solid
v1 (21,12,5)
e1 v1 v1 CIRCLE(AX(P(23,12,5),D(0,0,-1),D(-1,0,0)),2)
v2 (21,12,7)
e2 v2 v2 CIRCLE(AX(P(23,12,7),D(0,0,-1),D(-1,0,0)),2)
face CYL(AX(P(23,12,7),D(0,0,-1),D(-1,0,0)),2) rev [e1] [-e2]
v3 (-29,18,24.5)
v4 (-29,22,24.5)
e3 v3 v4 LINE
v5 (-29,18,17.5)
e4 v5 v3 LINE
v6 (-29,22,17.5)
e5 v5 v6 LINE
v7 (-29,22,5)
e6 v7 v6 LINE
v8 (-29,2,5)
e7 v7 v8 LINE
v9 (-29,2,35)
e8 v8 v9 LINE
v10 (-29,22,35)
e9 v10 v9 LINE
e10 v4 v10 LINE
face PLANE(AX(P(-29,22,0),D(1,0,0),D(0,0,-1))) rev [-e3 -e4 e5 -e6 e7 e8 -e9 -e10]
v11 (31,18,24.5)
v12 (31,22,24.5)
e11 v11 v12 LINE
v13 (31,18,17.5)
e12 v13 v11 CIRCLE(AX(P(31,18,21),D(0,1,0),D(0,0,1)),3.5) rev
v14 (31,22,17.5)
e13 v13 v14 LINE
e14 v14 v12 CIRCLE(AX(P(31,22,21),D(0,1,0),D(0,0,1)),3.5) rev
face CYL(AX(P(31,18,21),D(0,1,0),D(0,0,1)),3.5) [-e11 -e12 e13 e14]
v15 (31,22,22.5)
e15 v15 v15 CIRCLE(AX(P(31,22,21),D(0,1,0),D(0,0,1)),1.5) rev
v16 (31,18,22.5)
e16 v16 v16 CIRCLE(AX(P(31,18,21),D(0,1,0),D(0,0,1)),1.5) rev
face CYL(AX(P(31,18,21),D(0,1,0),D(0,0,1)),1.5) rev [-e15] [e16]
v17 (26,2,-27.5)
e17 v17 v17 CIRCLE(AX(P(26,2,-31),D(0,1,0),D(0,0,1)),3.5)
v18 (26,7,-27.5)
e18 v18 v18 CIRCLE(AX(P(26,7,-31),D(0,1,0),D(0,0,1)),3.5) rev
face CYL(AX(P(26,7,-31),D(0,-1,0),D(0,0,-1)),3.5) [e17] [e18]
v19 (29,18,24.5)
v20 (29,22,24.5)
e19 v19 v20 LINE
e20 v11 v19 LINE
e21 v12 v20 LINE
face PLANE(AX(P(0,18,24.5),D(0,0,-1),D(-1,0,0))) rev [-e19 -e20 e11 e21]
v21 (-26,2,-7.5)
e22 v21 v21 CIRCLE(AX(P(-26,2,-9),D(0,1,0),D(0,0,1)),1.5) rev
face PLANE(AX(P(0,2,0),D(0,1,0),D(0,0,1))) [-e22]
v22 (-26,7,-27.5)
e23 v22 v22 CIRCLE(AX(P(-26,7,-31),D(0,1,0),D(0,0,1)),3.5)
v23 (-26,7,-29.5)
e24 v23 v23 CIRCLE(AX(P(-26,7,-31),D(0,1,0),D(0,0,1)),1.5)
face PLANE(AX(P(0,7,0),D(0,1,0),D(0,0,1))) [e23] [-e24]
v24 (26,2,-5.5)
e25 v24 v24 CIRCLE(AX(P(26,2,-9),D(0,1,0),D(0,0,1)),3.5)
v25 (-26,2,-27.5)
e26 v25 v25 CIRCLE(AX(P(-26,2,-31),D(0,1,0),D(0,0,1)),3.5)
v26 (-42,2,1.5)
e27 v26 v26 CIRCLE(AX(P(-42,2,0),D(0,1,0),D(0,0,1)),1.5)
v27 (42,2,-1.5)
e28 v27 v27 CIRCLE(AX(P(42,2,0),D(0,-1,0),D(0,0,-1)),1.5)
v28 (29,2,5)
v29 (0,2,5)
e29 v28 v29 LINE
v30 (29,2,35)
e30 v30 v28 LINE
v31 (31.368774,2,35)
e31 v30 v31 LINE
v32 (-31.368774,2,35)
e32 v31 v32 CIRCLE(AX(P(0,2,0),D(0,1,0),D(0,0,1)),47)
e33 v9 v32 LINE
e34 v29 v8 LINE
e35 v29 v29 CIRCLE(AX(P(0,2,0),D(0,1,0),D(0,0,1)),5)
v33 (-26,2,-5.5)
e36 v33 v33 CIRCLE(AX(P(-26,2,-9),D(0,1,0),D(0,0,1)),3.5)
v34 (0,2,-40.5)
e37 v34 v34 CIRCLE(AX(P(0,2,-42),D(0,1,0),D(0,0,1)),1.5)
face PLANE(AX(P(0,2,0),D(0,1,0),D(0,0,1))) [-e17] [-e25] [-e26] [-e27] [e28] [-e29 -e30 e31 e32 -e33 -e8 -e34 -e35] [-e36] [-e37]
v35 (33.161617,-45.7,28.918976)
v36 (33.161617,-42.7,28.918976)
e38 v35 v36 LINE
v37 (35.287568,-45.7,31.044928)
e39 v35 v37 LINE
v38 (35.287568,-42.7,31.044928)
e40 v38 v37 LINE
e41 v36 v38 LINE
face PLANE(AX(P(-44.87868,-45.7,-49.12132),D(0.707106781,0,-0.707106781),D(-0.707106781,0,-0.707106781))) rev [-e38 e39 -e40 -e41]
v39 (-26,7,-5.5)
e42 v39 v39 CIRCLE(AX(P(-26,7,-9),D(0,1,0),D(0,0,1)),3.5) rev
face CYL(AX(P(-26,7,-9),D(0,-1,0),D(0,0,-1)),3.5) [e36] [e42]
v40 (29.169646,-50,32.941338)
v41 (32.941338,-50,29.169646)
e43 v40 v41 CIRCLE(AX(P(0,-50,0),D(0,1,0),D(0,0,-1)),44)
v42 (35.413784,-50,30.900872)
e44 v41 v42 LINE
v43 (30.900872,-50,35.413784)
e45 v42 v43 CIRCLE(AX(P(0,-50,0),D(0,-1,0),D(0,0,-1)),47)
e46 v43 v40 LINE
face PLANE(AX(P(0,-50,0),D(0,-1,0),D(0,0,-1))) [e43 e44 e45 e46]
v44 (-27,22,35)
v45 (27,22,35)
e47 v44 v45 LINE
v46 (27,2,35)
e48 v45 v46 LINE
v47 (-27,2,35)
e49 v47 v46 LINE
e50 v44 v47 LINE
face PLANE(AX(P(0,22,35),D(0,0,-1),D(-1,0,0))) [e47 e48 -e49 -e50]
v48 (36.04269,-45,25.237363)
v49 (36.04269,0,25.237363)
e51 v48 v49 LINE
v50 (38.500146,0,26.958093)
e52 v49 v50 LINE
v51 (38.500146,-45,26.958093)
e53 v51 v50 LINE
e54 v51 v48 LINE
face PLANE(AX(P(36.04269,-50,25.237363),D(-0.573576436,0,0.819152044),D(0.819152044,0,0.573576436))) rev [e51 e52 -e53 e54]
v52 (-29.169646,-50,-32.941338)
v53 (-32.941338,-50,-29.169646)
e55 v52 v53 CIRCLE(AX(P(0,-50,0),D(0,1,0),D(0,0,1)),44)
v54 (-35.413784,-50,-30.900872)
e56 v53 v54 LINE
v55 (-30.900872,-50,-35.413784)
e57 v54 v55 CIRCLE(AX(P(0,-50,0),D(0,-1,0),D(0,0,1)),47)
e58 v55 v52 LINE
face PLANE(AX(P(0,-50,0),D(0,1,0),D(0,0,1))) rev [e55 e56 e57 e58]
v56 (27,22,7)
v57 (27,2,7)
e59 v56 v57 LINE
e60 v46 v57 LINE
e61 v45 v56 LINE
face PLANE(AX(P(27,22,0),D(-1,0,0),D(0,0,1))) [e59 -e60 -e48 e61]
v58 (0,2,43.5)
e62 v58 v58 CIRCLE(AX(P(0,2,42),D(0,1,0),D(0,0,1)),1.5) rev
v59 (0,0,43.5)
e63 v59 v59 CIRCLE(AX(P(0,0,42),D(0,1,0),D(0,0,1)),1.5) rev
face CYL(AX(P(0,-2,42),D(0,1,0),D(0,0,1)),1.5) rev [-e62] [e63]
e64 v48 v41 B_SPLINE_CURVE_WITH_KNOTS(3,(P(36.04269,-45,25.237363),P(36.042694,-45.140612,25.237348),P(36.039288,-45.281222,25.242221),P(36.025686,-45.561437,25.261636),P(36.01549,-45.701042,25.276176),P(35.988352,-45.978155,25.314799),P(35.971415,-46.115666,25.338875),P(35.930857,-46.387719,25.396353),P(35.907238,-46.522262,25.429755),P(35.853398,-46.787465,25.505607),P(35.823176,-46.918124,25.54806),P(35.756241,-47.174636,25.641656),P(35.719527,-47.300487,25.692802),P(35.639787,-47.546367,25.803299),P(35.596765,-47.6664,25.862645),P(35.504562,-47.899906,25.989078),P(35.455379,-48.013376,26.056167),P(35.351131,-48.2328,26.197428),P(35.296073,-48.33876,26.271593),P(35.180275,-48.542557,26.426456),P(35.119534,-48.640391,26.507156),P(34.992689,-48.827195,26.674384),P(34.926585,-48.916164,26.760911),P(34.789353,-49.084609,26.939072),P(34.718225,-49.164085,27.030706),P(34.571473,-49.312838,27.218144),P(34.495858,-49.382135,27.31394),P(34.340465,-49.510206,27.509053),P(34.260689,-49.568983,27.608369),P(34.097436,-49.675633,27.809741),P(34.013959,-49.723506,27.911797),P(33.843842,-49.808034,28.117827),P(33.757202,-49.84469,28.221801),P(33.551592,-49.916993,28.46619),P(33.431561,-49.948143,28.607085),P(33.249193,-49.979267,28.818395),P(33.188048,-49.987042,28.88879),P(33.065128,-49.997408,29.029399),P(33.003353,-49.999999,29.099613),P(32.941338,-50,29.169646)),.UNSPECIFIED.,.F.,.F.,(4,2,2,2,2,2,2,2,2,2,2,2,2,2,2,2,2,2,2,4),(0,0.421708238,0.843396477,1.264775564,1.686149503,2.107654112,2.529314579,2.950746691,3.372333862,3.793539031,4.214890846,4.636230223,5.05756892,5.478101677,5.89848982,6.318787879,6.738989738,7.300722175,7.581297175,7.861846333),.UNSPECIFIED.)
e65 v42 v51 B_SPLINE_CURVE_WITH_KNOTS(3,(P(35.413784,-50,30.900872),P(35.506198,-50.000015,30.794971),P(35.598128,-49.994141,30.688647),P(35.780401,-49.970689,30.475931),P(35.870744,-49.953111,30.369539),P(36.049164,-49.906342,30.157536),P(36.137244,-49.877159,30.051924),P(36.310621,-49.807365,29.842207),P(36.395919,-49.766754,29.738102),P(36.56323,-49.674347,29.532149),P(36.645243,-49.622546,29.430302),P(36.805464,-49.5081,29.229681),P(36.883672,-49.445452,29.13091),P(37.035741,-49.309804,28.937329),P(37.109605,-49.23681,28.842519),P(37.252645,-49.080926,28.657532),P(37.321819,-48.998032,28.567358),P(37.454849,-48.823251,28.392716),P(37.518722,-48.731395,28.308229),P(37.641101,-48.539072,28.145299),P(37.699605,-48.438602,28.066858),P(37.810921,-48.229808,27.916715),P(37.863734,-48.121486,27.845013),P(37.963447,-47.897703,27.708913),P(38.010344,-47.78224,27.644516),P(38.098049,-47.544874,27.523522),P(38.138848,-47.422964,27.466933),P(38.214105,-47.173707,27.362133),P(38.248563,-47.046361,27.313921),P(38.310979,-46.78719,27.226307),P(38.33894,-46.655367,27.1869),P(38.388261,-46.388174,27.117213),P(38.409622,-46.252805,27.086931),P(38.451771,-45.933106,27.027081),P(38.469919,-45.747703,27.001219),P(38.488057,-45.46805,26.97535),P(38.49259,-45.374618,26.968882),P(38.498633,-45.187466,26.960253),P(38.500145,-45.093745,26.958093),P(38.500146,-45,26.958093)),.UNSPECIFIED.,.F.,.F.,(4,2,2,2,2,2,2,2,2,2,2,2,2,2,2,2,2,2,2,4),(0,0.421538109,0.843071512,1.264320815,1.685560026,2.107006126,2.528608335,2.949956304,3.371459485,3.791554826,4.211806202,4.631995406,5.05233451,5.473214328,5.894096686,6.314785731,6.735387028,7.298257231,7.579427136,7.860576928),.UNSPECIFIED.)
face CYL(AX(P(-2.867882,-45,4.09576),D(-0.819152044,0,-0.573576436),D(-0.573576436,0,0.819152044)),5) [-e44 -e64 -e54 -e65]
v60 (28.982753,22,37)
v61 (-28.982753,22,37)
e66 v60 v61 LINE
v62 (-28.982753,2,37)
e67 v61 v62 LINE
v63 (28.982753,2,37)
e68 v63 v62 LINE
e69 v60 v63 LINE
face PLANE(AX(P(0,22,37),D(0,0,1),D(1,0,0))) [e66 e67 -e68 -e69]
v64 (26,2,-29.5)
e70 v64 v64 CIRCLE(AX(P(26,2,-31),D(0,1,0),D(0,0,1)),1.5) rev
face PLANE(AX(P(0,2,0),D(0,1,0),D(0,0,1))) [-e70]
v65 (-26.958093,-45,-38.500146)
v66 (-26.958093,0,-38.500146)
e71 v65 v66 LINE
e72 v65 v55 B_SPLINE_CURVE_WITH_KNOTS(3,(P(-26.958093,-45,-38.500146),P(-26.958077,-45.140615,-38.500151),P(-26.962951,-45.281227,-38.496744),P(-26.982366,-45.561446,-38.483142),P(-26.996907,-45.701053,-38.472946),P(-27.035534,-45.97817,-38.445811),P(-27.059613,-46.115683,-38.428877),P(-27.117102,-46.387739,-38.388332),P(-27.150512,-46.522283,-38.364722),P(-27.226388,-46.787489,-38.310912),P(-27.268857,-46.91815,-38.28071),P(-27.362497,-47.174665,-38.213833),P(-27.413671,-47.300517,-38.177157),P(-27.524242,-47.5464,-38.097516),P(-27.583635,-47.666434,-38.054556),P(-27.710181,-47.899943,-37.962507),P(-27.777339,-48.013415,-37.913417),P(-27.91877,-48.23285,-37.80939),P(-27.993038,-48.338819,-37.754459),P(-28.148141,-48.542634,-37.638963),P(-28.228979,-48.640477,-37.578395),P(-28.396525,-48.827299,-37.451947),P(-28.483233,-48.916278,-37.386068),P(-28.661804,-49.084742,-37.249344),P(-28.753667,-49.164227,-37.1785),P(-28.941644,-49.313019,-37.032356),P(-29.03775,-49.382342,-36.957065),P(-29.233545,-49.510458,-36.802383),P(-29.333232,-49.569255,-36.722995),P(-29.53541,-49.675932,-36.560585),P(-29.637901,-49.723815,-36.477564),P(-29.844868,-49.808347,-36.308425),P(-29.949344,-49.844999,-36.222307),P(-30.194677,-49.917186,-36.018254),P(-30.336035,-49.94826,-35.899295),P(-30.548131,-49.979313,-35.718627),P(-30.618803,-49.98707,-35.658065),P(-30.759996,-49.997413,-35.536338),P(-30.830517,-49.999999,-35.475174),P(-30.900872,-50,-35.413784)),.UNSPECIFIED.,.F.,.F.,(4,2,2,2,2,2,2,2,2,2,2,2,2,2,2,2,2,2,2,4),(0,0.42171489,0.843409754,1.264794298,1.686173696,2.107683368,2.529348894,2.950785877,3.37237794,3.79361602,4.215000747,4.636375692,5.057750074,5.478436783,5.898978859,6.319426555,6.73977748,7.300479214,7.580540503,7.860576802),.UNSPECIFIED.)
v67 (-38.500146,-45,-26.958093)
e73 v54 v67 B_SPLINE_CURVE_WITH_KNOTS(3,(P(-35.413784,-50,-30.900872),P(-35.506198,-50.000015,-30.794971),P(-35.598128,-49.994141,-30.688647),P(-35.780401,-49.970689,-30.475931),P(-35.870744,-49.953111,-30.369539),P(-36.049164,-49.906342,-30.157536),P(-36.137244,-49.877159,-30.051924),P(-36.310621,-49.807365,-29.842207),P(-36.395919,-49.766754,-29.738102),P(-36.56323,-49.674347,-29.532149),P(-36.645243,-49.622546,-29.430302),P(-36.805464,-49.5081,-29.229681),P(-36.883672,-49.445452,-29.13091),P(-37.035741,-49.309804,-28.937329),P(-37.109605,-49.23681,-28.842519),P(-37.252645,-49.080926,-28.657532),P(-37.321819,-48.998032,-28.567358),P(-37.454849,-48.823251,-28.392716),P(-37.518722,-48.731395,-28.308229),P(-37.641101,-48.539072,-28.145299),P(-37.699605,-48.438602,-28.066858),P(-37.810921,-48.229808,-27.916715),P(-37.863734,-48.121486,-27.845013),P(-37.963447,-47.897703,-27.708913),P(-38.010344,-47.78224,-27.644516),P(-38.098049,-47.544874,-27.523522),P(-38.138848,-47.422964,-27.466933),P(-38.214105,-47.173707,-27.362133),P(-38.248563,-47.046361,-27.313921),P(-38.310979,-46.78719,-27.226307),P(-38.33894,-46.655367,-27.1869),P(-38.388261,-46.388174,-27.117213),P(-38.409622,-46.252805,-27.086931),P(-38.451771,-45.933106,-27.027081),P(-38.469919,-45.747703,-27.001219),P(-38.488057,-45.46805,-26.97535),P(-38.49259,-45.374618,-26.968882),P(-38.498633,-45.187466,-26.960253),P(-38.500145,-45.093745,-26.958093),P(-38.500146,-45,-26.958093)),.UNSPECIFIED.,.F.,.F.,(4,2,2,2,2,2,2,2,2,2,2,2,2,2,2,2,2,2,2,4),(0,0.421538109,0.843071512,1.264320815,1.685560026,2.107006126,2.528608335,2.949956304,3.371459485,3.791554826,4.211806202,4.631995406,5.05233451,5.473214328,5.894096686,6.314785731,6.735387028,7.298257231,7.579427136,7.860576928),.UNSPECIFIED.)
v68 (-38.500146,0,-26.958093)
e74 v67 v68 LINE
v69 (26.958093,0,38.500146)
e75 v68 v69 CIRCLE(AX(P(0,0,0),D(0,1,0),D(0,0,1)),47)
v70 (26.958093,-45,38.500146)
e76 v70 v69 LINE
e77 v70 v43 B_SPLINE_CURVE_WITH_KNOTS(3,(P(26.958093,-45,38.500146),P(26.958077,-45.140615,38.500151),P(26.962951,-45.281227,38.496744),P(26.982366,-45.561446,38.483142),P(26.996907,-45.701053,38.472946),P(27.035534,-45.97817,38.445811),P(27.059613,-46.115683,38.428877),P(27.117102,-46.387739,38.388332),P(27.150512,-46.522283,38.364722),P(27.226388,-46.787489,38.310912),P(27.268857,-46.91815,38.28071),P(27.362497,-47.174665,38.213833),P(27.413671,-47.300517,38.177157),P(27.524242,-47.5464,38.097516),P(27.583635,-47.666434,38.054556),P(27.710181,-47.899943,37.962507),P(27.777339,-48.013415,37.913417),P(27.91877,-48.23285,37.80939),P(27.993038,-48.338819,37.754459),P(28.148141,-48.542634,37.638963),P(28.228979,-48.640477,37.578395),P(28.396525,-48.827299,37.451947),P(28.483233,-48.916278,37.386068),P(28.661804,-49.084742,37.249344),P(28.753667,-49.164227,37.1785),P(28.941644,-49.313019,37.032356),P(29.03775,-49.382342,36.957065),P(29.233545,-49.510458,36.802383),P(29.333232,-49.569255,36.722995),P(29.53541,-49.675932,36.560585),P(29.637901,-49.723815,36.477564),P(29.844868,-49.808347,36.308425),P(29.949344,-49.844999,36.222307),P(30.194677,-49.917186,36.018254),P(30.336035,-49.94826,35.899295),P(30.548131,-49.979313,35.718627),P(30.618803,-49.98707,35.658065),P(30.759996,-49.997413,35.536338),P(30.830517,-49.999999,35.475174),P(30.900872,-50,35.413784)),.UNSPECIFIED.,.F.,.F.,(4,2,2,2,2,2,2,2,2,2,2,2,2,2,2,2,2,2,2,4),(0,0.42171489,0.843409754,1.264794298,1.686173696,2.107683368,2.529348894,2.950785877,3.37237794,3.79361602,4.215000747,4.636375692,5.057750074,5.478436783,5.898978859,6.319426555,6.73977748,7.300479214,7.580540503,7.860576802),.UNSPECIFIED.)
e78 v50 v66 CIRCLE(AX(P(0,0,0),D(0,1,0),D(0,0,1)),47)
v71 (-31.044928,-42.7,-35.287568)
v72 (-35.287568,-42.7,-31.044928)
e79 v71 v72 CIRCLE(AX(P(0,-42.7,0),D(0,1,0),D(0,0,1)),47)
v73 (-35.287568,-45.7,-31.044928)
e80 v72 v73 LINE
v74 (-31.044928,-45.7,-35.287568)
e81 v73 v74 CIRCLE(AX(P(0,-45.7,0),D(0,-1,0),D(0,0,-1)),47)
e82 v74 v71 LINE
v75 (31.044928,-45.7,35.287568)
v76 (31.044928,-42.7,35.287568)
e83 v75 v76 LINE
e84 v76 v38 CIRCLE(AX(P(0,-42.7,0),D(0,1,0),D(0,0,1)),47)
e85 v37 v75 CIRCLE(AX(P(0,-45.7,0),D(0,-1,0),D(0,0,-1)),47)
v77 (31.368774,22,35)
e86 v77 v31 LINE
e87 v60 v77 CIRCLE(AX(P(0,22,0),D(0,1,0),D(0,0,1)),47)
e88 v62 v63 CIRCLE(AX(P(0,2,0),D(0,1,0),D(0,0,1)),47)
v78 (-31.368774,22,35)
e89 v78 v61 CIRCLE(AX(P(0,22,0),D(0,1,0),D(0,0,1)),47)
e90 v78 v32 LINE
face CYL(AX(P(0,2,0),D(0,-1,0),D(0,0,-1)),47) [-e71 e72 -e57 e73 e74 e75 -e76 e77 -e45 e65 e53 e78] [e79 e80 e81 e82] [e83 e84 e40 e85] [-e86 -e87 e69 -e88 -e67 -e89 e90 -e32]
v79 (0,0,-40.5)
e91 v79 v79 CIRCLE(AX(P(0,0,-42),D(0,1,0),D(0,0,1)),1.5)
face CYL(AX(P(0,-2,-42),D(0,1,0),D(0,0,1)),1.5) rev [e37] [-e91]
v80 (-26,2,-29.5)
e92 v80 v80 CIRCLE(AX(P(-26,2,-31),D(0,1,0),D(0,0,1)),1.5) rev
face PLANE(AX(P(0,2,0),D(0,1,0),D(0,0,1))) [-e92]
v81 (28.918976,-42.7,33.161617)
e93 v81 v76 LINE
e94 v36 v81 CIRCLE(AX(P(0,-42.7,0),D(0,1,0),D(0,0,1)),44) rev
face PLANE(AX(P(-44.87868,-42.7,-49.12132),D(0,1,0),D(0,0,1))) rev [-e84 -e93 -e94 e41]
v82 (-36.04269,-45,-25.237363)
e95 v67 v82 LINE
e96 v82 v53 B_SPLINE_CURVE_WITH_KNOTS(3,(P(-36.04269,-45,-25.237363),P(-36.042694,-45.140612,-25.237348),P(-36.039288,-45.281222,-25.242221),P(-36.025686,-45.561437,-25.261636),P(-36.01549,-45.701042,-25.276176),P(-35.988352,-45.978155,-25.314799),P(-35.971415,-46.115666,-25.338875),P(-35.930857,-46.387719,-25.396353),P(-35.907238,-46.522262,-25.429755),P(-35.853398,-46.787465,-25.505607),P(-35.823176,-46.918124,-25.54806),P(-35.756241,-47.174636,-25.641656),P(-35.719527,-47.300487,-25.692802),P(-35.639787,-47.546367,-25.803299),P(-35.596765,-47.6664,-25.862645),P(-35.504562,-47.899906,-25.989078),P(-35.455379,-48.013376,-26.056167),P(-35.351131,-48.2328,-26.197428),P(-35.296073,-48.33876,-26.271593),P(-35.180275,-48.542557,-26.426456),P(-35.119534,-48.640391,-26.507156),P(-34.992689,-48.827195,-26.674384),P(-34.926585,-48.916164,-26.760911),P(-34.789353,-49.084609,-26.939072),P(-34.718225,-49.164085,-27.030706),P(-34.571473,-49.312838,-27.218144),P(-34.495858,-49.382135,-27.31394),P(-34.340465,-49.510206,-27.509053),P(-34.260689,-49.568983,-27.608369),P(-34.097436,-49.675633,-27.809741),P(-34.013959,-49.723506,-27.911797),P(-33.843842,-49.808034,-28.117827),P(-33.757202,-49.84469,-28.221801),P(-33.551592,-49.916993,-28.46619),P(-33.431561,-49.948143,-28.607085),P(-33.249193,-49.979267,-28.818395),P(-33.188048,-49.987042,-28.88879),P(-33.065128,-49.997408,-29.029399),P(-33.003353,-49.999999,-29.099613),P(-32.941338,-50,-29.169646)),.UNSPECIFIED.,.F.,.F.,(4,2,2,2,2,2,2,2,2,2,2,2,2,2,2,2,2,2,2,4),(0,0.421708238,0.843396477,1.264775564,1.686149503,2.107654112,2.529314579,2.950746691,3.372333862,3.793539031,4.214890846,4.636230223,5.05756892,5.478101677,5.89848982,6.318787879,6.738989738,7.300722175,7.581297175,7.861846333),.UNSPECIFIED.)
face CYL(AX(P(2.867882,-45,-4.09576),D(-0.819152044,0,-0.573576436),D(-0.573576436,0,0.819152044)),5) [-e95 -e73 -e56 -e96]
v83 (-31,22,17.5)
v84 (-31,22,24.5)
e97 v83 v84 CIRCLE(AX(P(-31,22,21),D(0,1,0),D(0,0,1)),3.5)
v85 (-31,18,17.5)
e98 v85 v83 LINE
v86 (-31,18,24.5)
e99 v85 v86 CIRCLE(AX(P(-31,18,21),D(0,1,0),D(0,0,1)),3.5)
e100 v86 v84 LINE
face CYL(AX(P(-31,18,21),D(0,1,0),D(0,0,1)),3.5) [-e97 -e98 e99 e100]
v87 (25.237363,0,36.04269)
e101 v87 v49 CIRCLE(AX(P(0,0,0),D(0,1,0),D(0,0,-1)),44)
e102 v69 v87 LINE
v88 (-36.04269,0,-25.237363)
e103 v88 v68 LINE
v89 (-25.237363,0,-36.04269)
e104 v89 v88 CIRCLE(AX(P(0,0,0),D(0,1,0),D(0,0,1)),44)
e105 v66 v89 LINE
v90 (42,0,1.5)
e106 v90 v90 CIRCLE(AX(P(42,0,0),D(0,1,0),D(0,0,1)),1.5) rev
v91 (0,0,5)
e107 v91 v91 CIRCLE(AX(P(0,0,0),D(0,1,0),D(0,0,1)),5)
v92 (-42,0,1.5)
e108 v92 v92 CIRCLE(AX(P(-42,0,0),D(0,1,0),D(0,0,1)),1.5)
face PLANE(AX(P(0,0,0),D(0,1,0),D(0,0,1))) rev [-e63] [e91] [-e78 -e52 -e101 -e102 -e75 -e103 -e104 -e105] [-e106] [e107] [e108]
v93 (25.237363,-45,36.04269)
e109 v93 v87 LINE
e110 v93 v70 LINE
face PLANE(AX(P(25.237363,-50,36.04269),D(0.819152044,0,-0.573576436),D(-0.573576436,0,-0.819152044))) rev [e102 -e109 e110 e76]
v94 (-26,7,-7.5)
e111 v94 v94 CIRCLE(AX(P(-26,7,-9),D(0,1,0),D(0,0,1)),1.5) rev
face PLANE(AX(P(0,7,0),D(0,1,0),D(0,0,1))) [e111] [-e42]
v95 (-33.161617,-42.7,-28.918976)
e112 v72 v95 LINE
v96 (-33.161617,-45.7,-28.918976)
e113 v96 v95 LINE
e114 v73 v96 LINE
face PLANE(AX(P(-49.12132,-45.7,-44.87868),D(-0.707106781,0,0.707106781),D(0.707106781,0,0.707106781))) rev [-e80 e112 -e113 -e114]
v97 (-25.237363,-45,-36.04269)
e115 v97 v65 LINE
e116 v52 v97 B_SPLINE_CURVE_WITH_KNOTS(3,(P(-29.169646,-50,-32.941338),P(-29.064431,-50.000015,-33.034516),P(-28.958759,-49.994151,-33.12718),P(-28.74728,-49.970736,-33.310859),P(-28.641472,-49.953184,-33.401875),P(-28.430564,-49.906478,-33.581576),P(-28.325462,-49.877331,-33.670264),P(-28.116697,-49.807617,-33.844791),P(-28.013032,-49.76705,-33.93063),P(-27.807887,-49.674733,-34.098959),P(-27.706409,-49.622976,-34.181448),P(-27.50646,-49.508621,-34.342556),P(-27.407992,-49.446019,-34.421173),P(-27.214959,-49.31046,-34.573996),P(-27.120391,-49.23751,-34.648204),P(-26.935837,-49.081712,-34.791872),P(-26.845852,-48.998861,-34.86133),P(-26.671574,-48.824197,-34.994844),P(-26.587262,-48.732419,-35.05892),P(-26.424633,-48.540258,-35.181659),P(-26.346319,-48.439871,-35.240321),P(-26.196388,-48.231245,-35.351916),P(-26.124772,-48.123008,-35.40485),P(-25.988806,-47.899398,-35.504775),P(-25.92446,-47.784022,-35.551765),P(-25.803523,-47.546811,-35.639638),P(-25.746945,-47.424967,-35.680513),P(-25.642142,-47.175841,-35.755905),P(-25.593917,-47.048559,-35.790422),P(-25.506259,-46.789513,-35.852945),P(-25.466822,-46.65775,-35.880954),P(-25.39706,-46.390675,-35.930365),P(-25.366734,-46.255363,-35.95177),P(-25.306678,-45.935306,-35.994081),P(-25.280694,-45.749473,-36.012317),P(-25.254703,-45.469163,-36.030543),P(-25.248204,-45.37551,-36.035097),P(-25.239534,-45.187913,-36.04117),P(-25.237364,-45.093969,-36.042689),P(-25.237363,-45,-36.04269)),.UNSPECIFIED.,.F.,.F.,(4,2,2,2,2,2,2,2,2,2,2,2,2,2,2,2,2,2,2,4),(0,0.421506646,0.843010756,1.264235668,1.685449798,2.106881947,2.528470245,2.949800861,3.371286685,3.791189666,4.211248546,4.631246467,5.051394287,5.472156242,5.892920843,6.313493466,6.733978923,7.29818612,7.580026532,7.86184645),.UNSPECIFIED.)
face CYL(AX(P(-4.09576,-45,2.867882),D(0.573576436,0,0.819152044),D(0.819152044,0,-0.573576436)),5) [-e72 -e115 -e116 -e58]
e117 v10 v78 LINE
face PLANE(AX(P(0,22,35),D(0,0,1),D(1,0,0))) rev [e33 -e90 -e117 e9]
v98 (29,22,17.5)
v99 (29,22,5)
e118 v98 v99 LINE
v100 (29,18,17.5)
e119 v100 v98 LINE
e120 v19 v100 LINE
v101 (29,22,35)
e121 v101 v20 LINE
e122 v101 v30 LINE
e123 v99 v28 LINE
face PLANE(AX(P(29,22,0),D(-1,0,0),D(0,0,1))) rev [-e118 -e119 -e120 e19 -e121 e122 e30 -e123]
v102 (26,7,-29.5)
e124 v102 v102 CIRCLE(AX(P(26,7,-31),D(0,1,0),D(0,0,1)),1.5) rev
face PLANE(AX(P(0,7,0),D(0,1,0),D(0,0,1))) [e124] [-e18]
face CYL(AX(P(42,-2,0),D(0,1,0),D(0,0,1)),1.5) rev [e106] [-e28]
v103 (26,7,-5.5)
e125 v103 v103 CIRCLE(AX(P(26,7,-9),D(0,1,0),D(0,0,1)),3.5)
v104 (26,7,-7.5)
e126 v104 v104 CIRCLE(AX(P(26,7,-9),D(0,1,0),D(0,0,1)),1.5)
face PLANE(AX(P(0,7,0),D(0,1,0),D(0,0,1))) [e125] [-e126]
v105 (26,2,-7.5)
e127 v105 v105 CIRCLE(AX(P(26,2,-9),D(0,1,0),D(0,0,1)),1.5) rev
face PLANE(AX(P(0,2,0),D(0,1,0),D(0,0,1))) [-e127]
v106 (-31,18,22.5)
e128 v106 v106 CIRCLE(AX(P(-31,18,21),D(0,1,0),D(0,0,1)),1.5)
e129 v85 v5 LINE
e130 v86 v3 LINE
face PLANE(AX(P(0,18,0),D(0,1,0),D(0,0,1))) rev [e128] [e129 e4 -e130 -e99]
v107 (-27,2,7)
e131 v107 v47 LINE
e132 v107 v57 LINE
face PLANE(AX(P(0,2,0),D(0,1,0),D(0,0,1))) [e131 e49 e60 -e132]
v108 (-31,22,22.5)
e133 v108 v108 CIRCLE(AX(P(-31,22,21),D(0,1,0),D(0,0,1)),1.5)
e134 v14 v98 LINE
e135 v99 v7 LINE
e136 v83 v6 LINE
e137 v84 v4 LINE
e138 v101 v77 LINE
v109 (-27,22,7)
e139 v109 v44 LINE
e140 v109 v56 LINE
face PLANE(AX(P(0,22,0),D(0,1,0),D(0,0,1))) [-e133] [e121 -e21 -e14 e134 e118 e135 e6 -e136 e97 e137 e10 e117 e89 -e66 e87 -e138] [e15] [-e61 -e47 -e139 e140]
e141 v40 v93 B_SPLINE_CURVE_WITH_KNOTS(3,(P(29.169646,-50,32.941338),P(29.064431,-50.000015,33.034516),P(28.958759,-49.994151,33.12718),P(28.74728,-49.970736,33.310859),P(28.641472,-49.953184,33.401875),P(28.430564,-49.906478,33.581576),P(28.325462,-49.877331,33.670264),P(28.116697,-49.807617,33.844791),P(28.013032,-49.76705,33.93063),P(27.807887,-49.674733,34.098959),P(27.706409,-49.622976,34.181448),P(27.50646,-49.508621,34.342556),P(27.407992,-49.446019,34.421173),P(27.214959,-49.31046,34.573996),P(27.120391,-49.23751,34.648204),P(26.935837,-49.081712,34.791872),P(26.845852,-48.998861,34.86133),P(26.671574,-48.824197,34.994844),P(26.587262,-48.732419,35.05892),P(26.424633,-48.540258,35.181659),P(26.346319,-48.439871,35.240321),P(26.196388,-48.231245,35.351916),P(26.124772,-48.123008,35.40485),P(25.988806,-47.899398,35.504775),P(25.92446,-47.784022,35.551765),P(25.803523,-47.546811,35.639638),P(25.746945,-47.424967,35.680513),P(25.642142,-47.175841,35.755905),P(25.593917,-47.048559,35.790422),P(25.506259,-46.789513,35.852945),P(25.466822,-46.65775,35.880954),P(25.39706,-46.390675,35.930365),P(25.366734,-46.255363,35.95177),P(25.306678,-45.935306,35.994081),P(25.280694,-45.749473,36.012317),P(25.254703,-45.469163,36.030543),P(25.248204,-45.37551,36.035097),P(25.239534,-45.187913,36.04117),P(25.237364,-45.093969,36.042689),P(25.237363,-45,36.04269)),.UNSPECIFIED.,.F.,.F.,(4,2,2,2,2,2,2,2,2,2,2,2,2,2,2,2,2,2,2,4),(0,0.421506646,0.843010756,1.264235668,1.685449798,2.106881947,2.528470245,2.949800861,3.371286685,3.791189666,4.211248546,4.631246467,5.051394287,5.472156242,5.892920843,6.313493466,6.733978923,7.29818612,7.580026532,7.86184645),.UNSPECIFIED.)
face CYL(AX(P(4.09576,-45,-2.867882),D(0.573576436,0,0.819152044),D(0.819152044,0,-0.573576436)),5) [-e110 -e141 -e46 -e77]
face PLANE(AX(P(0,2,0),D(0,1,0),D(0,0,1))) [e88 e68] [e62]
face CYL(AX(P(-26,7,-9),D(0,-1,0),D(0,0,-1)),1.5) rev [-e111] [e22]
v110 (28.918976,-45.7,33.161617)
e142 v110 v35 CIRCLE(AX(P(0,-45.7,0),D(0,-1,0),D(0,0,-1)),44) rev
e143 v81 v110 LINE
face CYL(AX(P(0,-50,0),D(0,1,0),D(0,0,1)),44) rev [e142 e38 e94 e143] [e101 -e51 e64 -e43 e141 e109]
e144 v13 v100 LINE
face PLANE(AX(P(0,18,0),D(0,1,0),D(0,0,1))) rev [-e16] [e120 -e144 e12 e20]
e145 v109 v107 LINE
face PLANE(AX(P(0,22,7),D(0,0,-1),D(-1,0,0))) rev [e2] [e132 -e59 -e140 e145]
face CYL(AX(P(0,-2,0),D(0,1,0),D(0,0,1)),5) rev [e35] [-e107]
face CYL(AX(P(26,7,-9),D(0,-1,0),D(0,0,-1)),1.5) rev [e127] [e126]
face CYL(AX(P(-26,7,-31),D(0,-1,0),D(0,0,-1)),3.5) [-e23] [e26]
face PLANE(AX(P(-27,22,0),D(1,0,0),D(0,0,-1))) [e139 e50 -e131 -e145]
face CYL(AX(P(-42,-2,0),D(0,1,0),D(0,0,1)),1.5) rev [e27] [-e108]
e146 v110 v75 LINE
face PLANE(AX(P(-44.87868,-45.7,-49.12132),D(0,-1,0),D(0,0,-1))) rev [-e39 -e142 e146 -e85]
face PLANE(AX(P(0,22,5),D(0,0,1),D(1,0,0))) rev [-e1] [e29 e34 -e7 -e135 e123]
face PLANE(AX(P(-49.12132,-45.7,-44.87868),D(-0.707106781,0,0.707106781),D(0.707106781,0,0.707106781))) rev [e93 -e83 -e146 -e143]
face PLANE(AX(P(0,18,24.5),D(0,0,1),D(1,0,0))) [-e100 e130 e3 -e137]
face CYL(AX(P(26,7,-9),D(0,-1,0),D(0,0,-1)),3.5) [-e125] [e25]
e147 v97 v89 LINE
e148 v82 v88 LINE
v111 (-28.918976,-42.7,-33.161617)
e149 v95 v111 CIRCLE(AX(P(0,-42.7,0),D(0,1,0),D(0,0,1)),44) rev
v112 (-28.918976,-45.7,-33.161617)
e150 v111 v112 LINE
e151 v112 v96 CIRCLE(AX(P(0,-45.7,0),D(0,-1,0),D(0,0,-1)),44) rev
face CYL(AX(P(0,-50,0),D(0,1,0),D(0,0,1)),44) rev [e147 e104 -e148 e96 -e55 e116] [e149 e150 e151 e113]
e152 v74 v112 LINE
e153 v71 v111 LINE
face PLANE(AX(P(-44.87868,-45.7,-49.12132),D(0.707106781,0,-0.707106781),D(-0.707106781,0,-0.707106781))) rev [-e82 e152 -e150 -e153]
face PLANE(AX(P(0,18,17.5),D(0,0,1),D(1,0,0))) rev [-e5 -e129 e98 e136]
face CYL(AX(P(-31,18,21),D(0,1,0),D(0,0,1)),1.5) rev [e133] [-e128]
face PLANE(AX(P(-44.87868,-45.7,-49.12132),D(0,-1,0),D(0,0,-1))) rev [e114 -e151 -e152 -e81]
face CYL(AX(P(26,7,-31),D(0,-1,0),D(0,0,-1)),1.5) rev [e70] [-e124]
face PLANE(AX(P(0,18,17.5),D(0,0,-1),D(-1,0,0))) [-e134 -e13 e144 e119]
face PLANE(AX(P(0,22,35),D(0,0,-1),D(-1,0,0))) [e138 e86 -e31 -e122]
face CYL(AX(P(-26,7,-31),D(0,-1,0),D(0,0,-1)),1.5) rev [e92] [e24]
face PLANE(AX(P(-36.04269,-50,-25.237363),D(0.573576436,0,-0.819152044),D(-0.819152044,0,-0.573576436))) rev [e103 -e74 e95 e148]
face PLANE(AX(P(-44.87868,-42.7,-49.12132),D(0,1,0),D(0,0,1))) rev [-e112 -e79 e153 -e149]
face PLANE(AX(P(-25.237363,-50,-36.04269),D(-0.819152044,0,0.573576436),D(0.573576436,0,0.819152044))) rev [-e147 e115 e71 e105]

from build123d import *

# Parameters (mm, degrees)
CROQUIS1_R                 = 47
SALIENTE_EXTRUIR1_DEPTH    = 2
CROQUIS2_W                 = 54
CROQUIS2_H                 = 28
SALIENTE_EXTRUIR4_DEPTH    = 20
CROQUIS3_R                 = 3.5
CROQUIS3_R_2               = 1.5
SALIENTE_EXTRUIR5_DEPTH    = 5
CROQUIS4_R                 = 1.5
SALIENTE_EXTRUIR6_DEPTH    = 4
CROQUIS5_R                 = 1.5
CORTAR_EXTRUIR1_DEPTH      = 4
CROQUIS6_R                 = 5
CORTAR_EXTRUIR2_DEPTH      = 4
CROQUIS7_R                 = 2
CORTAR_EXTRUIR3_DEPTH      = 2
SALIENTE_EXTRUIR7_START    = 50
SALIENTE_EXTRUIR7_DEPTH    = 50
REDONDEO1_R                = 5
REDONDEO2_R                = 5
SALIENTE_EXTRUIR9_DEPTH    = 50
CORTAR_EXTRUIR6_DEPTH      = 128.666518168
CORTAR_EXTRUIR6_DEPTH_BACK = 128.666518168
CROQUIS12_W                = 6
CROQUIS12_H                = 3


# Read off the part's stored shape, not the designer's step: Cortar-Extruir7
with BuildPart() as part:
    # Croquis1 → Saliente-Extruir1 (new body)
    with BuildSketch(Plane(origin=(0, 0, 0), x_dir=(1, 0, 0), z_dir=(0, 1, 0))):
        with Locations(Location((0, 0, 0), (0, 0, 270))):
            Circle(CROQUIS1_R)
    extrude(amount=SALIENTE_EXTRUIR1_DEPTH)

    # Croquis2 → Saliente-Extruir4 (add)
    with BuildSketch(Plane(origin=(0, 2, 0), x_dir=(1, 0, 0), z_dir=(0, 1, 0))):
        with BuildLine():
            Line((29, -5), (-29, -5))
            Line((-29, -5), (-29, -35))
            Line((-29, -35), (-31.368774283, -35))
            ThreePointArc((-31.368774283, -35), (-30.19232893, -36.019762267), (-28.982753492, -37))
            Line((-28.982753492, -37), (28.982753492, -37))
            ThreePointArc((28.982753492, -37), (30.19232893, -36.019762267), (31.368774283, -35))
            Line((31.368774283, -35), (29, -35))
            Line((29, -35), (29, -5))
        make_face()
        with Locations((0, -21)):
            Rectangle(CROQUIS2_W, CROQUIS2_H, mode=Mode.SUBTRACT)
    extrude(amount=SALIENTE_EXTRUIR4_DEPTH)

    # Croquis3 → Saliente-Extruir5 (add)
    # profile 1 of 4: a face of its own
    with BuildSketch(Plane(origin=(0, 2, 0), x_dir=(1, 0, 0), z_dir=(0, 1, 0))):
        with Locations(Location((-26, 31, 0), (0, 0, 270))):
            Circle(CROQUIS3_R)
        with Locations(Location((-26, 31, 0), (0, 0, 270))):
            Circle(CROQUIS3_R_2, mode=Mode.SUBTRACT)
    # profile 2 of 4: a face of its own
    with BuildSketch(Plane(origin=(0, 2, 0), x_dir=(1, 0, 0), z_dir=(0, 1, 0))):
        with Locations(Location((-26, 9, 0), (0, 0, 270))):
            Circle(CROQUIS3_R)
        with Locations(Location((-26, 9, 0), (0, 0, 270))):
            Circle(CROQUIS3_R_2, mode=Mode.SUBTRACT)
    # profile 3 of 4: a face of its own
    with BuildSketch(Plane(origin=(0, 2, 0), x_dir=(1, 0, 0), z_dir=(0, 1, 0))):
        with Locations(Location((26, 9, 0), (0, 0, 270))):
            Circle(CROQUIS3_R)
        with Locations(Location((26, 9, 0), (0, 0, 270))):
            Circle(CROQUIS3_R_2, mode=Mode.SUBTRACT)
    # profile 4 of 4: a face of its own
    with BuildSketch(Plane(origin=(0, 2, 0), x_dir=(1, 0, 0), z_dir=(0, 1, 0))):
        with Locations(Location((26, 31, 0), (0, 0, 270))):
            Circle(CROQUIS3_R)
        with Locations(Location((26, 31, 0), (0, 0, 270))):
            Circle(CROQUIS3_R_2, mode=Mode.SUBTRACT)
    extrude(amount=SALIENTE_EXTRUIR5_DEPTH)

    # Croquis4 → Saliente-Extruir6 (add)
    # profile 1 of 2: a face of its own
    with BuildSketch(Plane(origin=(0, 22, 0), x_dir=(1, 0, 0), z_dir=(0, 1, 0))):
        with BuildLine():
            Line((-29, -17.5), (-31, -17.5))
            ThreePointArc((-31, -17.5), (-34.5, -21), (-31, -24.5))
            Line((-31, -24.5), (-29, -24.5))
            Line((-29, -24.5), (-29, -17.5))
        make_face()
        with Locations(Location((-31, -21, 0), (0, 0, 270))):
            Circle(CROQUIS4_R, mode=Mode.SUBTRACT)
    # profile 2 of 2: a face of its own
    with BuildSketch(Plane(origin=(0, 22, 0), x_dir=(1, 0, 0), z_dir=(0, 1, 0))):
        with BuildLine():
            ThreePointArc((31, -24.5), (34.5, -21), (31, -17.5))
            Line((31, -17.5), (29, -17.5))
            Line((29, -17.5), (29, -24.5))
            Line((29, -24.5), (31, -24.5))
        make_face()
        with Locations(Location((31, -21, 0), (0, 0, 270))):
            Circle(CROQUIS4_R, mode=Mode.SUBTRACT)
    extrude(amount=-SALIENTE_EXTRUIR6_DEPTH)

    # Croquis5 → Cortar-Extruir1 (cut)
    with BuildSketch(Plane(origin=(0, 2, 0), x_dir=(1, 0, 0), z_dir=(0, 1, 0))):
        with Locations(Location((0, 42, 0), (0, 0, 270))):
            Circle(CROQUIS5_R)
        with Locations(Location((0, -42, 0), (0, 0, 270))):
            Circle(CROQUIS5_R)
        with Locations(Location((42, 0, 0), (0, 0, 270))):
            Circle(CROQUIS5_R)
        with Locations(Location((-42, 0, 0), (0, 0, 270))):
            Circle(CROQUIS5_R)
    extrude(amount=-CORTAR_EXTRUIR1_DEPTH, mode=Mode.SUBTRACT)

    # Croquis6 → Cortar-Extruir2 (cut)
    with BuildSketch(Plane(origin=(0, 2, 0), x_dir=(1, 0, 0), z_dir=(0, 1, 0))):
        with Locations(Location((0, 0, 0), (0, 0, 270))):
            Circle(CROQUIS6_R)
    extrude(amount=-CORTAR_EXTRUIR2_DEPTH, mode=Mode.SUBTRACT)

    # Croquis7 → Cortar-Extruir3 (cut)
    with BuildSketch(Plane(origin=(0, 0, 5), x_dir=(-1, 0, 0), z_dir=(0, 0, -1))):
        with Locations((-23, 12)):
            Circle(CROQUIS7_R)
    extrude(amount=-CORTAR_EXTRUIR3_DEPTH, mode=Mode.SUBTRACT)

    # Croquis8 → Saliente-Extruir7 (add)
    with BuildSketch(Plane.XZ.offset(SALIENTE_EXTRUIR7_START)):
        with BuildLine():
            Line((-25.237363199, -36.042689949), (-26.958092508, -38.500146082))
            ThreePointArc((-26.958092508, -38.500146082), (-33.234018716, -33.234018716), (-38.500146082, -26.958092508))
            Line((-38.500146082, -26.958092508), (-36.042689949, -25.237363199))
            ThreePointArc((-36.042689949, -25.237363199), (-31.112698372, -31.112698372), (-25.237363199, -36.042689949))
        make_face()
        with BuildLine():
            Line((25.237363199, 36.042689949), (26.958092508, 38.500146082))
            ThreePointArc((26.958092508, 38.500146082), (33.234018716, 33.234018716), (38.500146082, 26.958092508))
            Line((38.500146082, 26.958092508), (36.042689949, 25.237363199))
            ThreePointArc((36.042689949, 25.237363199), (31.112698372, 31.112698372), (25.237363199, 36.042689949))
        make_face()
    extrude(amount=-SALIENTE_EXTRUIR7_DEPTH)

    # Redondeo1
    redondeo1_edges = [part.edges().sort_by_distance(p)[0] for p in [
        (37.271418015, -50, 26.097727854),
        (26.097727854, -50, 37.271418015),
    ]]
    fillet(redondeo1_edges, radius=REDONDEO1_R)

    # Redondeo2
    redondeo2_edges = [part.edges().sort_by_distance(p)[0] for p in [
        (-37.271418015, -50, -26.097727854),
        (-26.097727854, -50, -37.271418015),
    ]]
    fillet(redondeo2_edges, radius=REDONDEO2_R)


with BuildPart() as body_2:
    # Croquis9 → Saliente-Extruir9 (new body)
    with BuildSketch(Plane.XZ.offset(50)):
        Polygon((34.648232278, 34.648232278), (32.526911935, 36.769552622), (33.941125497, 38.183766184), (38.183766184, 33.941125497), (36.769552622, 32.526911935), align=None)
    extrude(amount=-SALIENTE_EXTRUIR9_DEPTH)


with BuildPart() as cortar_extruir6_tool:
    # Croquis12 → Cortar-Extruir6 (new, two sides: drawn at the far end of the back side and taken through both)
    with BuildSketch(Plane(origin=(36.062445841, 0, 36.062445841), x_dir=(0.7071067811865475, 0, -0.7071067811865477), z_dir=(0.7071067811865477, 0, 0.7071067811865475)).offset(-CORTAR_EXTRUIR6_DEPTH_BACK)):
        with Locations((0, -44.2)):
            Rectangle(CROQUIS12_W, CROQUIS12_H)
    extrude(amount=CORTAR_EXTRUIR6_DEPTH + CORTAR_EXTRUIR6_DEPTH_BACK)


with BuildPart() as part_1:
    add(part.part)

    # Cortar-Extruir6: cut by cortar_extruir6_tool
    add(cortar_extruir6_tool.part, mode=Mode.SUBTRACT)


with BuildPart() as body_2_1:
    add(body_2.part)

    # Cortar-Extruir6: cut by cortar_extruir6_tool
    add(cortar_extruir6_tool.part, mode=Mode.SUBTRACT)


solid = part_1.part
